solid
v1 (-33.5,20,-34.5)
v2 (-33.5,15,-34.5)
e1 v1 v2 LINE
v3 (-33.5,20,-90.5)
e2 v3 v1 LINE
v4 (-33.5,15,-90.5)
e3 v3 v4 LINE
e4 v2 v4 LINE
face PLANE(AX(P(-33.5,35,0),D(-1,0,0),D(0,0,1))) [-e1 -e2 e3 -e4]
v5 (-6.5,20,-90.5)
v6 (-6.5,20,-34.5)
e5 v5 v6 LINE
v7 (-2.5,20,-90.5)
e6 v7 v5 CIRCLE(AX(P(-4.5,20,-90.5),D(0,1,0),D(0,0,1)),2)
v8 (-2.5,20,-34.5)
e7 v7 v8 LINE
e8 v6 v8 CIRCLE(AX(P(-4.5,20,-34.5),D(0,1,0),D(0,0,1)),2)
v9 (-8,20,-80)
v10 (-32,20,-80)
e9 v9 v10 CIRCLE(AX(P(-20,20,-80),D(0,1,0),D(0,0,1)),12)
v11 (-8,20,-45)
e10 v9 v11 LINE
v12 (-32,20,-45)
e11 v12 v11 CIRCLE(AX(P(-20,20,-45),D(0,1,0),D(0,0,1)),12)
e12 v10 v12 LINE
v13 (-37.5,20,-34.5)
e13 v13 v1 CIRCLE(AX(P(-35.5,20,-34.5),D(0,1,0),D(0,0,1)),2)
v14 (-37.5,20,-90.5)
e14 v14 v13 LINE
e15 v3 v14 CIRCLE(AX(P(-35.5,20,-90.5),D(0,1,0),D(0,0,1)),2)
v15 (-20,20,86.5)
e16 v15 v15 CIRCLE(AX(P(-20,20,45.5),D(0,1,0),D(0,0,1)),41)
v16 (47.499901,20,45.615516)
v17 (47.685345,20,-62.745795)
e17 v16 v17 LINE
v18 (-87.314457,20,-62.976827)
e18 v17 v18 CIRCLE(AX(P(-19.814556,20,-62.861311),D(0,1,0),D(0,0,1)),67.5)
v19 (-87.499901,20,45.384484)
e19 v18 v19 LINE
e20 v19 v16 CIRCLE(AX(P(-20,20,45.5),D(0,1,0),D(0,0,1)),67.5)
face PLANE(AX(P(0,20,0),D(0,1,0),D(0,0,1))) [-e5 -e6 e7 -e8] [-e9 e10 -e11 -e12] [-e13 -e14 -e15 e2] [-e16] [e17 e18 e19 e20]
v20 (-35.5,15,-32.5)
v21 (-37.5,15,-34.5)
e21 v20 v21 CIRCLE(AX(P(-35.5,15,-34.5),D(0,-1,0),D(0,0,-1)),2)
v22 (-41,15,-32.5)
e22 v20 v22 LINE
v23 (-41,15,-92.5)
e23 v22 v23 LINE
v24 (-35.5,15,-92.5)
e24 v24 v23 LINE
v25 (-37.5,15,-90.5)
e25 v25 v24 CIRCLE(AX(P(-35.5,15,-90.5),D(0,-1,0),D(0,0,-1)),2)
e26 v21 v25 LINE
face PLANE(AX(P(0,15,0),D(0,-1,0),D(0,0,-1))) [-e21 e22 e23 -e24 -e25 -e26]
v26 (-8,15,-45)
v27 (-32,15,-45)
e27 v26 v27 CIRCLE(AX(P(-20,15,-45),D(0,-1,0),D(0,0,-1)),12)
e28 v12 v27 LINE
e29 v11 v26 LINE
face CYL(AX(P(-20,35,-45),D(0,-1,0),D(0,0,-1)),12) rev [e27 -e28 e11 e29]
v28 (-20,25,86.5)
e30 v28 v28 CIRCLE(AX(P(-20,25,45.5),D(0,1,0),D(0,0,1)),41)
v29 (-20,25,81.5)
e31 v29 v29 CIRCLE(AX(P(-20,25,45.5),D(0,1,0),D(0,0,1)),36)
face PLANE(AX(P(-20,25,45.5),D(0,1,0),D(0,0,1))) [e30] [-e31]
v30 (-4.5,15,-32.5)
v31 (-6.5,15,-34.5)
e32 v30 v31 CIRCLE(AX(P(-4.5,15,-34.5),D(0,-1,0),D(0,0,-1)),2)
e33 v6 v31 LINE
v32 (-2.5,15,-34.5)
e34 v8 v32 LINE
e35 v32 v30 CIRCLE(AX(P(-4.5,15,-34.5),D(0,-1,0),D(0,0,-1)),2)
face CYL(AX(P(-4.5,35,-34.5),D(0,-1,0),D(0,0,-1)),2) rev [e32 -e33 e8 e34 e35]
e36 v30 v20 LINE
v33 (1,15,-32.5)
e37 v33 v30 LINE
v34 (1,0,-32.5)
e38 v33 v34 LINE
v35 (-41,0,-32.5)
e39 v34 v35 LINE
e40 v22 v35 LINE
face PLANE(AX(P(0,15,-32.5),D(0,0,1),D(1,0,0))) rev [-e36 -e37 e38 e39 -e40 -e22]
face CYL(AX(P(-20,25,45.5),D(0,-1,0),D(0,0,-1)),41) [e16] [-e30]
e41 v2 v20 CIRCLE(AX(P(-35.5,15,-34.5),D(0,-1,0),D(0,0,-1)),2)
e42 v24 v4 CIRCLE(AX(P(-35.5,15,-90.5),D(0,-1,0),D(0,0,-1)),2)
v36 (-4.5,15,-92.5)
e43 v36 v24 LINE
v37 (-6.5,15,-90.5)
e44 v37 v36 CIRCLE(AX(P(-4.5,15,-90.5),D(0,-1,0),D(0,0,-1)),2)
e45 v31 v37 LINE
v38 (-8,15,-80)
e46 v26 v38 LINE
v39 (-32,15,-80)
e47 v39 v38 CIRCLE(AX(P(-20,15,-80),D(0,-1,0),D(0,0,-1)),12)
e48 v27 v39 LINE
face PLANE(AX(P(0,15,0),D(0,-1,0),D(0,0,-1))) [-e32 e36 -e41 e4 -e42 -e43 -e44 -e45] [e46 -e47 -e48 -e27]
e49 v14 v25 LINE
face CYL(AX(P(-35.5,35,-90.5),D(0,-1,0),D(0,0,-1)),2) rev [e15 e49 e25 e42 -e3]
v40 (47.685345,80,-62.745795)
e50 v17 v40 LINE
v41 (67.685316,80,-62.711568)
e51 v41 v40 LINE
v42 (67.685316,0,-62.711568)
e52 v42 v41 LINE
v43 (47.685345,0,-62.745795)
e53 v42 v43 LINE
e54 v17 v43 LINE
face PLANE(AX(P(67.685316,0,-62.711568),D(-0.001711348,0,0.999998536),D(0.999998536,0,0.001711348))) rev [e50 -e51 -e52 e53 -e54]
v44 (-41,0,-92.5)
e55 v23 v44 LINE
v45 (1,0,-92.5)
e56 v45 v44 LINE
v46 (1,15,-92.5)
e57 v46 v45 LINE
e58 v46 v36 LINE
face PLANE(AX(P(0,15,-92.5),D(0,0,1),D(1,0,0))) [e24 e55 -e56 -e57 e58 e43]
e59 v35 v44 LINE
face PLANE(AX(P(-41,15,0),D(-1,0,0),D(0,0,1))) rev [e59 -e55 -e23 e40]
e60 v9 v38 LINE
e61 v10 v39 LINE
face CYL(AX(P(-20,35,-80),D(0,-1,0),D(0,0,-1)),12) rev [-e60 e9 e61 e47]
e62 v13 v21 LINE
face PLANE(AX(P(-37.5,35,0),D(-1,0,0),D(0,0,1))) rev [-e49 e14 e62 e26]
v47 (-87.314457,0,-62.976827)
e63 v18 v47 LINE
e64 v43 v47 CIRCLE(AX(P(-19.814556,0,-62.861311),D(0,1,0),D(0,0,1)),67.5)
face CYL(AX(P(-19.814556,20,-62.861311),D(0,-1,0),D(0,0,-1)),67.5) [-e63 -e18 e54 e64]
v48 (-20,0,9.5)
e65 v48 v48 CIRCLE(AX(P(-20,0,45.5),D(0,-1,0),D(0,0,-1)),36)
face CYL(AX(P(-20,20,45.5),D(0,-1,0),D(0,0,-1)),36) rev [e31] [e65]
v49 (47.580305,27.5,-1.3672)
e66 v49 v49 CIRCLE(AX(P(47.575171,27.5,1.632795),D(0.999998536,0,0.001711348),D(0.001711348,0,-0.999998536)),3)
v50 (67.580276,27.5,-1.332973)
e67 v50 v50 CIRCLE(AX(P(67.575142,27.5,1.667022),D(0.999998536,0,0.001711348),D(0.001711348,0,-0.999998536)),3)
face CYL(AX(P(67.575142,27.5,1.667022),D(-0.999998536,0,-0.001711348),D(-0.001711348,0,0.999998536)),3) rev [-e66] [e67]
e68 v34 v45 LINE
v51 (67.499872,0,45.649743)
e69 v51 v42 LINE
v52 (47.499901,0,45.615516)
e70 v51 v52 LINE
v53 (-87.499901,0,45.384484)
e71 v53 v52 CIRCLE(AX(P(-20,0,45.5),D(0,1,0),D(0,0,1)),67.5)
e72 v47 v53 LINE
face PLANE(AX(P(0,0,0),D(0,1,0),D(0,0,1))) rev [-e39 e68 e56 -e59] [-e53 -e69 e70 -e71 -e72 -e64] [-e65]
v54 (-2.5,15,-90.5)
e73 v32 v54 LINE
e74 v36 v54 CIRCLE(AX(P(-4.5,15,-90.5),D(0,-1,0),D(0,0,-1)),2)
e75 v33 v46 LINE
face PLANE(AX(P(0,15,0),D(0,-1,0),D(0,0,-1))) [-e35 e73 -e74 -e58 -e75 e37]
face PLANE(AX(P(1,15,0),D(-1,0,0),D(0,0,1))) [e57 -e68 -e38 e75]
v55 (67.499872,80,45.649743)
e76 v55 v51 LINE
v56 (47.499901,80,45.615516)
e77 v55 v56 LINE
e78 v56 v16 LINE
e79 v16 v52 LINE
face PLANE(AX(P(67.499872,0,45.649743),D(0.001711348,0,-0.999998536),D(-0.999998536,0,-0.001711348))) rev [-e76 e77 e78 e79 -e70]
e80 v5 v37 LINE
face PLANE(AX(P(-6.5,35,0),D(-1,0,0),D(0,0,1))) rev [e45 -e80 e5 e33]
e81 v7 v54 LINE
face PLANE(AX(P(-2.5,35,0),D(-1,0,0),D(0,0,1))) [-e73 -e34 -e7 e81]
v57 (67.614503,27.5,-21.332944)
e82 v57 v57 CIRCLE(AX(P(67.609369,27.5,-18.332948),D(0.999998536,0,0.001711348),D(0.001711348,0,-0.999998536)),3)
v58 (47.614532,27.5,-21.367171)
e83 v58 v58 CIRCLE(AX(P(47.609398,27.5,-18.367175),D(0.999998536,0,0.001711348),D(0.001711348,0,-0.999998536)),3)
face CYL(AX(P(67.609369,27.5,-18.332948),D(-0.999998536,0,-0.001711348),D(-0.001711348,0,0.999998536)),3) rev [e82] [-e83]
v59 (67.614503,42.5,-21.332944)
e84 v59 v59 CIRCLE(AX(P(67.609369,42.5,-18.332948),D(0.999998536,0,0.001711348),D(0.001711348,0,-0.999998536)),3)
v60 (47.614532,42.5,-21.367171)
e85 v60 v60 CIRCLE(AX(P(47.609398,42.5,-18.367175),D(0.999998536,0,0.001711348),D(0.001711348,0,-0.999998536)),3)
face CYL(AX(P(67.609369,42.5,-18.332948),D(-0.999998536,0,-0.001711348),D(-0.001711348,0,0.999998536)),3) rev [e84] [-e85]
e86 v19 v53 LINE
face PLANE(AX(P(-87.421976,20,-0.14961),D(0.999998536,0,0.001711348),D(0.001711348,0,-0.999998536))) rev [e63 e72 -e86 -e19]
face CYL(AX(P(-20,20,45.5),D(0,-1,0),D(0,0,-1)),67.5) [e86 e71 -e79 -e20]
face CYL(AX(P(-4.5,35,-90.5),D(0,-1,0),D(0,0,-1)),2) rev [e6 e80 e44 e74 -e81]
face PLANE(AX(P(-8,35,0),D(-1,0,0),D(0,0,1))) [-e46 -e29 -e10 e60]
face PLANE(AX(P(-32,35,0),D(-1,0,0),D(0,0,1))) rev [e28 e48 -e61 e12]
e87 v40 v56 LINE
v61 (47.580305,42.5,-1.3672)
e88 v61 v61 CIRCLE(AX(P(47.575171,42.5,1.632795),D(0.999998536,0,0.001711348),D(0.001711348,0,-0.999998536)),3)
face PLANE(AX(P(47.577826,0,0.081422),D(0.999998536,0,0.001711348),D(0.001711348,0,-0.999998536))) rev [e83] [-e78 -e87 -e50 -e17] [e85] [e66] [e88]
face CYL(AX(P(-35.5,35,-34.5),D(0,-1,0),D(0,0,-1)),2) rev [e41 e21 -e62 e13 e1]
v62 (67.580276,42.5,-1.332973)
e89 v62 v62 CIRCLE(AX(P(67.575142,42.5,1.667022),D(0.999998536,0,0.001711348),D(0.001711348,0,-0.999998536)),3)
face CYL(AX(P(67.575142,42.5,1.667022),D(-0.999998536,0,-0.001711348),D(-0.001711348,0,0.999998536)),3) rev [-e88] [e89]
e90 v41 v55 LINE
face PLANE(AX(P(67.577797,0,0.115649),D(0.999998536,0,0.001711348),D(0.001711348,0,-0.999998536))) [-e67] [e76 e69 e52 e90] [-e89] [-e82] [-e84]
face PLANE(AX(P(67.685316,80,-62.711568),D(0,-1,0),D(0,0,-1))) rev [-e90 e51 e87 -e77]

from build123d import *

# Parameters (mm, degrees)
BOSS_EXTRUDE1_DEPTH = 20
SKETCH8_W           = 42
SKETCH8_H           = 60
CUT_EXTRUDE1_DEPTH  = 15
CUT_EXTRUDE2_START  = -5
CUT_EXTRUDE2_DEPTH  = 5
SKETCH10_R          = 36
CUT_EXTRUDE3_DEPTH  = 159.272933389
SKETCH11_R          = 41
SKETCH11_R_2        = 36
BOSS_EXTRUDE4_DEPTH = 5
SKETCH2_W           = 108.361469825
SKETCH2_H           = 80
SKETCH2_R           = 3
BOSS_EXTRUDE6_DEPTH = 20


# Read off the part's stored shape, not the designer's step: Cut-Extrude2
with BuildPart() as part:
    # Sketch1 → Boss-Extrude1 (new body)
    with BuildSketch(Plane(origin=(0, 0, 0), x_dir=(1, 0, 0), z_dir=(0, 1, 0))):
        with BuildLine():
            Line((47.685345344, 62.745795153), (47.499901156, -45.615515992))
            ThreePointArc((47.499901156, -45.615515992), (-20.115515992, -112.999901156), (-87.499901156, -45.384484008))
            Line((-87.499901156, -45.384484008), (-87.314456968, 62.976827137))
            ThreePointArc((-87.314456968, 62.976827137), (-19.69903982, 130.361212301), (47.685345344, 62.745795153))
        make_face()
    extrude(amount=BOSS_EXTRUDE1_DEPTH)

    # Sketch8 → Cut-Extrude1 (cut)
    with BuildSketch(Plane.XZ):
        with Locations((-20, -62.5)):
            Rectangle(SKETCH8_W, SKETCH8_H)
    extrude(amount=-CUT_EXTRUDE1_DEPTH, mode=Mode.SUBTRACT)

    # Cut-Extrude2 outline → Cut-Extrude2 (cut)
    with BuildSketch(Plane.XZ.offset(-15).offset(CUT_EXTRUDE2_START)):
        with BuildLine():
            Line((-6.5, -34.5), (-6.5, -90.5))
            ThreePointArc((-6.5, -90.5), (-4.5, -92.5), (-2.5, -90.5))
            Line((-2.5, -90.5), (-2.5, -34.5))
            ThreePointArc((-2.5, -34.5), (-4.5, -32.5), (-6.5, -34.5))
        make_face()
        with BuildLine():
            ThreePointArc((-8, -45), (-20, -33), (-32, -45))
            Line((-32, -45), (-32, -80))
            ThreePointArc((-32, -80), (-20, -92), (-8, -80))
            Line((-8, -80), (-8, -45))
        make_face()
        with BuildLine():
            Line((-37.5, -34.5), (-37.5, -90.5))
            ThreePointArc((-37.5, -90.5), (-35.5, -92.5), (-33.5, -90.5))
            Line((-33.5, -90.5), (-33.5, -34.5))
            ThreePointArc((-33.5, -34.5), (-35.5, -32.5), (-37.5, -34.5))
        make_face()
    extrude(amount=CUT_EXTRUDE2_DEPTH, mode=Mode.SUBTRACT)

    # Sketch10 → Cut-Extrude3 (cut, through all)
    with BuildSketch(Plane.XZ):
        with Locations(Location((-20, 45.5, 0), (0, 0, 270))):
            Circle(SKETCH10_R)
    extrude(amount=-CUT_EXTRUDE3_DEPTH, mode=Mode.SUBTRACT)

    # Sketch11 → Boss-Extrude4 (add)
    with BuildSketch(Plane(origin=(0, 20, 0), x_dir=(1, 0, 0), z_dir=(0, 1, 0))):
        with Locations(Location((-20, -45.5, 0), (0, 0, 270))):
            Circle(SKETCH11_R)
        with Locations(Location((-20, -45.5, 0), (0, 0, 90))):
            Circle(SKETCH11_R_2, mode=Mode.SUBTRACT)
    extrude(amount=BOSS_EXTRUDE4_DEPTH)

    # Sketch2 → Boss-Extrude6 (add)
    with BuildSketch(Plane(origin=(47.577825951, 0, 0.081422338), x_dir=(0.0017113480294572096, 0, -0.9999985356428889), z_dir=(0.999998535642889, 0, 0.0017113480294572096))):
        with Locations((8.64657458, 40)):
            Rectangle(SKETCH2_W, SKETCH2_H)
        with Locations((-1.551375347, 27.5)):
            Circle(SKETCH2_R, mode=Mode.SUBTRACT)
        with Locations((18.448624653, 27.5)):
            Circle(SKETCH2_R, mode=Mode.SUBTRACT)
        with Locations((18.448624653, 42.5)):
            Circle(SKETCH2_R, mode=Mode.SUBTRACT)
        with Locations((-1.551375347, 42.5)):
            Circle(SKETCH2_R, mode=Mode.SUBTRACT)
    extrude(amount=BOSS_EXTRUDE6_DEPTH)


solid = part.part
